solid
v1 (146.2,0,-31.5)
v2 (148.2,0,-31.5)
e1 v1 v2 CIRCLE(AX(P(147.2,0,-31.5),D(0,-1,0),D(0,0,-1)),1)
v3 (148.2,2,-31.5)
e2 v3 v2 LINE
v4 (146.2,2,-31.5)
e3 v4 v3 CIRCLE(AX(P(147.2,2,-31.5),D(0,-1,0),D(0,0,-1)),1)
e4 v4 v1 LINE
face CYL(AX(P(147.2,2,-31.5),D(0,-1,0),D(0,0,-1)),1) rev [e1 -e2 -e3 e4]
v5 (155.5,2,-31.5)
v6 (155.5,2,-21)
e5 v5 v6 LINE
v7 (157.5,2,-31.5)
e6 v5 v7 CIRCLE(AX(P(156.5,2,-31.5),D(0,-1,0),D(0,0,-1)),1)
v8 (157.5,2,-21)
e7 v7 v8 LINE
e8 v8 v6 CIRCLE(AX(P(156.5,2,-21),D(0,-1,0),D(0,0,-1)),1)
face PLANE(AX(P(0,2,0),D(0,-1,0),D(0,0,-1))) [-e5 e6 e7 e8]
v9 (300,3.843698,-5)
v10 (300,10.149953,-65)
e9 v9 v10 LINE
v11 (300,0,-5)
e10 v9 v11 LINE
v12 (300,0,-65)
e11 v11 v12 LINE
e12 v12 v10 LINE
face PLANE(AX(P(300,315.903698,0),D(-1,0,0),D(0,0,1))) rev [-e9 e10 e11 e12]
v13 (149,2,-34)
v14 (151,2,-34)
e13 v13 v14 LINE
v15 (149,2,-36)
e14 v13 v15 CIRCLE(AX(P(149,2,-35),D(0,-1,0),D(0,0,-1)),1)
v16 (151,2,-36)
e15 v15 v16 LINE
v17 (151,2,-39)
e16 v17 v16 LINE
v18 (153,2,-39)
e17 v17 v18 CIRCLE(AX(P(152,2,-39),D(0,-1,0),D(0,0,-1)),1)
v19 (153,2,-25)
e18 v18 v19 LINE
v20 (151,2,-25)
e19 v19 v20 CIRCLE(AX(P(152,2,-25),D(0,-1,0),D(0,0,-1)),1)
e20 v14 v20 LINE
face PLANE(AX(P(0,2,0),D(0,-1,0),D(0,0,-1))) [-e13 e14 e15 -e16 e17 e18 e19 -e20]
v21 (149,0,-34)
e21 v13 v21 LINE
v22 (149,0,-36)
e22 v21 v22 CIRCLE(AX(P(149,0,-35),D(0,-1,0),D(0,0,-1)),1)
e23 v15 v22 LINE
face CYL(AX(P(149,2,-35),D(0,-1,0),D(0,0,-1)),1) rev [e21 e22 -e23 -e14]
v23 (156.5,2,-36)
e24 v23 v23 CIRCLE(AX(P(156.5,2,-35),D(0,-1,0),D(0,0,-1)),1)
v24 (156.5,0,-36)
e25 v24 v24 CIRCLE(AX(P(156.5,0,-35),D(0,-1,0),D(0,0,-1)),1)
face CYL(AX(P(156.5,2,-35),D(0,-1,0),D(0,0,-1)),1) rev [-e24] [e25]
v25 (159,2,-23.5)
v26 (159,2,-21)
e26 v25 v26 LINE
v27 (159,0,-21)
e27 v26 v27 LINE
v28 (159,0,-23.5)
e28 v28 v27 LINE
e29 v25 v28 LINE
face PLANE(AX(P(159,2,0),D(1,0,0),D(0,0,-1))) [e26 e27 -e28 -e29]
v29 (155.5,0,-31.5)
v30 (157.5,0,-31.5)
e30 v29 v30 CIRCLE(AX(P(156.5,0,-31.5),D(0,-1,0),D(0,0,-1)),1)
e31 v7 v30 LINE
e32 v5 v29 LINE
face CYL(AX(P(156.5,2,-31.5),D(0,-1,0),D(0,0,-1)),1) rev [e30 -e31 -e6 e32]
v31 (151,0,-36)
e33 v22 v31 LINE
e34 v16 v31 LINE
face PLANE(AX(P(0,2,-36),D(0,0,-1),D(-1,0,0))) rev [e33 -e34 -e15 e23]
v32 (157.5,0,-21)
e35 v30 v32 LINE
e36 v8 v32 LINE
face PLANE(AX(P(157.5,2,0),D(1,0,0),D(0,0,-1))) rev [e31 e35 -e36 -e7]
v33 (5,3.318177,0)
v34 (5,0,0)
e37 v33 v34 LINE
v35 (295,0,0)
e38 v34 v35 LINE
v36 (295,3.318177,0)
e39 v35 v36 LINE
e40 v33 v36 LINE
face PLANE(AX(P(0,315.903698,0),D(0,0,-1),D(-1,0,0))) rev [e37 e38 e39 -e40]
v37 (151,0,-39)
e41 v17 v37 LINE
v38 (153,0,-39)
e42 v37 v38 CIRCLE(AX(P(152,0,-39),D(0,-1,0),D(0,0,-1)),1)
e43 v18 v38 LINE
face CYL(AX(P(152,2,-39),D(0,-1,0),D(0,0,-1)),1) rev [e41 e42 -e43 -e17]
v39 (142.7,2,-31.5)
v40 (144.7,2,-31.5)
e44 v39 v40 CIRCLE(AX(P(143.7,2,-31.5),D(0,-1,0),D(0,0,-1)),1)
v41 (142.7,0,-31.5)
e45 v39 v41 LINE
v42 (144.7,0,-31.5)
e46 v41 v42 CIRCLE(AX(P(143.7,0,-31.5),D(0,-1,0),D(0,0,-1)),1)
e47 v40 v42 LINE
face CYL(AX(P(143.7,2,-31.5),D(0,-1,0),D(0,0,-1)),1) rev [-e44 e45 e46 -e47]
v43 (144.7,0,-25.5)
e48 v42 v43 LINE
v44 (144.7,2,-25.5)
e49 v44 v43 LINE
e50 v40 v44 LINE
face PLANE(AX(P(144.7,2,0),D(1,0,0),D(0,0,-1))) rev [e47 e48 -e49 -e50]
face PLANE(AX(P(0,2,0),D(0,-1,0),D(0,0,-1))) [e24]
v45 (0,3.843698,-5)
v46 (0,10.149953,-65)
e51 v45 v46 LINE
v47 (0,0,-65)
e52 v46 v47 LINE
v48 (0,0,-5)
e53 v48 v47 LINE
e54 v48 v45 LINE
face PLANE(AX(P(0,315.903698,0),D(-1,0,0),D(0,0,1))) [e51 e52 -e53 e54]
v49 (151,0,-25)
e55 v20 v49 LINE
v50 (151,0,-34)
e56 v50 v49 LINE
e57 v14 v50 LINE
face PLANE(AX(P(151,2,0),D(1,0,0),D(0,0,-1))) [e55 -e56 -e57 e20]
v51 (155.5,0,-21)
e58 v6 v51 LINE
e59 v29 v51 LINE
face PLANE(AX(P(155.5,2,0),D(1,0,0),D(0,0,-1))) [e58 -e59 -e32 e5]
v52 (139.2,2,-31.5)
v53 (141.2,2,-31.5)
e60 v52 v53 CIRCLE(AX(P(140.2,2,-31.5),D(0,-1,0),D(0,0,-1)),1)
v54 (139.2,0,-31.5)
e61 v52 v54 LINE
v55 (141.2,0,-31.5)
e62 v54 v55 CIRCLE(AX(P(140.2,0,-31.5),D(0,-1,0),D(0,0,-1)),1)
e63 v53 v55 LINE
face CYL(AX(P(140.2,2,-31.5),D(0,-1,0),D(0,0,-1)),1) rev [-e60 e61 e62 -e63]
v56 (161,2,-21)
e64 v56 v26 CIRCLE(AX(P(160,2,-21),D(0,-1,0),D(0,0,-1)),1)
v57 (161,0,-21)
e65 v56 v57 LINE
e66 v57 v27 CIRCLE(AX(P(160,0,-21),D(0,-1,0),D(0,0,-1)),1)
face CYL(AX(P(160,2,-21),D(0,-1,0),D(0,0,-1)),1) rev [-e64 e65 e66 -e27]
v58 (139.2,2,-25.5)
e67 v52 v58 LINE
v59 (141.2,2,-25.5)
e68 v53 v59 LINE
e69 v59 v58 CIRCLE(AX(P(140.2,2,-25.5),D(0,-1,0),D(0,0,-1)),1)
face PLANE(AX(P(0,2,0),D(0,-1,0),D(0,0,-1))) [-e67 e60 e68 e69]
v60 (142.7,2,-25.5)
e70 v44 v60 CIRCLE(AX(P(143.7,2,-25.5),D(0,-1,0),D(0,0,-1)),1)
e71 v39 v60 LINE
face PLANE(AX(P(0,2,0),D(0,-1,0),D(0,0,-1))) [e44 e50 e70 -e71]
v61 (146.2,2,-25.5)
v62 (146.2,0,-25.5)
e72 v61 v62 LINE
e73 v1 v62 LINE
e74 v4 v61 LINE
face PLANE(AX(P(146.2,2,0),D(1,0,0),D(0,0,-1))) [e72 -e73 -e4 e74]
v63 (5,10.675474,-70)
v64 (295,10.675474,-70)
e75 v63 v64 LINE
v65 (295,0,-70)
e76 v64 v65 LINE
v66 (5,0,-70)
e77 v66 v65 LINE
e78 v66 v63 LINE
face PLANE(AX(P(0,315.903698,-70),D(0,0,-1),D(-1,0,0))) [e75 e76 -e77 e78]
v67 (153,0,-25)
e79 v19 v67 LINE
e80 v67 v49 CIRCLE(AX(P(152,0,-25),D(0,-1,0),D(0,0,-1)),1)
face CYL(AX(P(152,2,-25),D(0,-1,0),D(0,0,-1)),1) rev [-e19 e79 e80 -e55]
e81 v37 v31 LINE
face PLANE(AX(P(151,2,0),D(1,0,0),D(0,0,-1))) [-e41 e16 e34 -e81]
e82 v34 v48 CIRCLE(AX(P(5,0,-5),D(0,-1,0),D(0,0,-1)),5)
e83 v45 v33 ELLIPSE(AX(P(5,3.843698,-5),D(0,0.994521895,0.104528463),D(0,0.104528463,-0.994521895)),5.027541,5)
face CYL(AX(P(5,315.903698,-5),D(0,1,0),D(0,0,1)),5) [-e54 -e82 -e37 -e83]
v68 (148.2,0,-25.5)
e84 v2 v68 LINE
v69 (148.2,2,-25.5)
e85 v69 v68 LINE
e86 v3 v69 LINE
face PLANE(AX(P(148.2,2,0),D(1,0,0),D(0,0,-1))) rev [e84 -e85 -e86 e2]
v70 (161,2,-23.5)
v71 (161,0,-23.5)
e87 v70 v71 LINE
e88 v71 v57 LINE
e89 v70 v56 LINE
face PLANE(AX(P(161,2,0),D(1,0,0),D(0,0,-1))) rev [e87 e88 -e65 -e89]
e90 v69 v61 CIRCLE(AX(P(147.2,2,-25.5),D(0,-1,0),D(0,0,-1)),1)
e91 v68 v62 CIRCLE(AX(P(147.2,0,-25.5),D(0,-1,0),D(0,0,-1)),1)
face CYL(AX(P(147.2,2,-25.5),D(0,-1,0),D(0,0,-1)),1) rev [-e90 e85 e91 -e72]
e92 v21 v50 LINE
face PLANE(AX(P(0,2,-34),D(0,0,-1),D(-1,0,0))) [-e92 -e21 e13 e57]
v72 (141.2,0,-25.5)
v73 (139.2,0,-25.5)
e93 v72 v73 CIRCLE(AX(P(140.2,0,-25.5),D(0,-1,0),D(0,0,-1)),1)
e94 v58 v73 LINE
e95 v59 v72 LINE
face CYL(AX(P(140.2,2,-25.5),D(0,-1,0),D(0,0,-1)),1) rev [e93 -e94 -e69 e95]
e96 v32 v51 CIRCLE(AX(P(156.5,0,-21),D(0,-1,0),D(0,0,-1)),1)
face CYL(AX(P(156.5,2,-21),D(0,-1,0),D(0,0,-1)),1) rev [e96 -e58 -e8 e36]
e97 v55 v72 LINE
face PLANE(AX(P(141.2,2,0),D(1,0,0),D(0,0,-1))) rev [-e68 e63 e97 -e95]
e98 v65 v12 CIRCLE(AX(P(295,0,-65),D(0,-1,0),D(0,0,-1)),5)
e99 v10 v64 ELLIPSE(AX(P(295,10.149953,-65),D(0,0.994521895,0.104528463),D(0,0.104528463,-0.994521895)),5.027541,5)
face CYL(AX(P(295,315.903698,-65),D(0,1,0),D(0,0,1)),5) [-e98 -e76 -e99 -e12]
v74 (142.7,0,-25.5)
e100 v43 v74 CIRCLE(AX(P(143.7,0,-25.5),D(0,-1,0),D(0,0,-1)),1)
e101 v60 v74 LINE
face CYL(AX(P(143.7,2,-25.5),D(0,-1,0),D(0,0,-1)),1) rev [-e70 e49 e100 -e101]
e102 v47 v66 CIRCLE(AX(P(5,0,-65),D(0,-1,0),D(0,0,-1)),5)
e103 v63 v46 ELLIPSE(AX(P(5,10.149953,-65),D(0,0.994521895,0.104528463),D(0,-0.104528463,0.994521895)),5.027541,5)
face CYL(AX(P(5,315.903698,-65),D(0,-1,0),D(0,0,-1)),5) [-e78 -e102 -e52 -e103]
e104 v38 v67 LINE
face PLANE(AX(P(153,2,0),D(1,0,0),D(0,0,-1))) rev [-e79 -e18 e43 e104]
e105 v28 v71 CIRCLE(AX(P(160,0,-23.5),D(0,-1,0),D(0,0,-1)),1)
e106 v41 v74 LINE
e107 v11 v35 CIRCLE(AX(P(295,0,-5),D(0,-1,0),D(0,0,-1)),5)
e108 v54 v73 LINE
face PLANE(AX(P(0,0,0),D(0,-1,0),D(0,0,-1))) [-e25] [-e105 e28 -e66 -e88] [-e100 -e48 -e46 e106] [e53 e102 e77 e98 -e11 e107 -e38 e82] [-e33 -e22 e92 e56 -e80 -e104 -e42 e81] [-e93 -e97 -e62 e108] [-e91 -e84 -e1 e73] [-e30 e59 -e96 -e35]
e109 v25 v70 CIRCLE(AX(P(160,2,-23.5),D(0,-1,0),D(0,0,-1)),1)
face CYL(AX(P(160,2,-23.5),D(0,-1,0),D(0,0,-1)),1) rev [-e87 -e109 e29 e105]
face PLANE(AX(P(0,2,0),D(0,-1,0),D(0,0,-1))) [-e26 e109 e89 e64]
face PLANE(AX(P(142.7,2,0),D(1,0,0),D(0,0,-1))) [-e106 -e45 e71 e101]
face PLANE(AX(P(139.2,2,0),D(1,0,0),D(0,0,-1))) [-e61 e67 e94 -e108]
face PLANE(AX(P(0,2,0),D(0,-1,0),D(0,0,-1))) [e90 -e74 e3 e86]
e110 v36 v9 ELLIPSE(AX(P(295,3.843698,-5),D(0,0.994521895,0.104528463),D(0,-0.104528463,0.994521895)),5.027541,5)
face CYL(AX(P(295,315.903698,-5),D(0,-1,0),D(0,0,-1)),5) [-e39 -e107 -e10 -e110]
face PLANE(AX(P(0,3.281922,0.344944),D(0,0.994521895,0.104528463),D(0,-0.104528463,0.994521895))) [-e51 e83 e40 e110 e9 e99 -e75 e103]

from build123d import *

# Parameters (mm, degrees)
BOSS_EXTRUDE1_REACH = 317.752
SKETCH1_W           = 300
SKETCH1_H           = 70
FILLET1_R           = 5
SKETCH2_R           = 1
CUT_EXTRUDE3_DEPTH  = 2


with BuildPart() as part:
    # Boss-Extrude1: up to this plane
    boss_extrude1_end = Plane(origin=(0, 3.281922255, 0.344943929), z_dir=(0, 0.9945218953682733, 0.10452846326765369))
    # Sketch1 → Boss-Extrude1 (new, up to the surface)
    with BuildSketch(Plane(origin=(0, 0, 0), x_dir=(1, 0, 0), z_dir=(0, 1, 0)), mode=Mode.PRIVATE) as boss_extrude1_sk1:
        with Locations((150, 35)):
            Rectangle(SKETCH1_W, SKETCH1_H)
    boss_extrude1_tool1 = split(extrude(boss_extrude1_sk1.sketch, amount=BOSS_EXTRUDE1_REACH, mode=Mode.PRIVATE), bisect_by=boss_extrude1_end, keep=Keep.BOTH, mode=Mode.PRIVATE)
    add(boss_extrude1_tool1.solids().sort_by_distance((150, 0, -35))[0])

    # Fillet1
    fillet1_edges = [part.edges().sort_by_distance(p)[0] for p in [
        (300, 5.337736896, -70),
        (300, 1.659088661, 0),
        (0, 1.659088661, 0),
        (0, 5.337736896, -70),
    ]]
    fillet(fillet1_edges, radius=FILLET1_R)

    # Sketch2 → Cut-Extrude3 (cut)
    with BuildSketch(Plane.XZ):
        with BuildLine():
            ThreePointArc((151, -39), (152, -40), (153, -39))
            Line((153, -39), (153, -25))
            ThreePointArc((153, -25), (152, -24), (151, -25))
            Line((151, -25), (151, -34))
            Line((151, -34), (149, -34))
            ThreePointArc((149, -34), (148, -35), (149, -36))
            Line((149, -36), (151, -36))
            Line((151, -36), (151, -39))
        make_face()
        with BuildLine():
            ThreePointArc((155.5, -31.5), (156.5, -32.5), (157.5, -31.5))
            Line((157.5, -31.5), (157.5, -21))
            ThreePointArc((157.5, -21), (156.5, -20), (155.5, -21))
            Line((155.5, -21), (155.5, -31.5))
        make_face()
        with BuildLine():
            ThreePointArc((146.2, -31.5), (147.2, -32.5), (148.2, -31.5))
            Line((148.2, -31.5), (148.2, -25.5))
            ThreePointArc((148.2, -25.5), (147.2, -24.5), (146.2, -25.5))
            Line((146.2, -25.5), (146.2, -31.5))
        make_face()
        with BuildLine():
            ThreePointArc((142.7, -31.5), (143.7, -32.5), (144.7, -31.5))
            Line((144.7, -31.5), (144.7, -25.5))
            ThreePointArc((144.7, -25.5), (143.7, -24.5), (142.7, -25.5))
            Line((142.7, -25.5), (142.7, -31.5))
        make_face()
        with BuildLine():
            ThreePointArc((139.2, -31.5), (140.2, -32.5), (141.2, -31.5))
            Line((141.2, -31.5), (141.2, -25.5))
            ThreePointArc((141.2, -25.5), (140.2, -24.5), (139.2, -25.5))
            Line((139.2, -25.5), (139.2, -31.5))
        make_face()
        with BuildLine():
            ThreePointArc((159, -23.5), (160, -24.5), (161, -23.5))
            Line((161, -23.5), (161, -21))
            ThreePointArc((161, -21), (160, -20), (159, -21))
            Line((159, -21), (159, -23.5))
        make_face()
        with Locations((156.5, -35)):
            Circle(SKETCH2_R)
    extrude(amount=-CUT_EXTRUDE3_DEPTH, mode=Mode.SUBTRACT)


solid = part.part
